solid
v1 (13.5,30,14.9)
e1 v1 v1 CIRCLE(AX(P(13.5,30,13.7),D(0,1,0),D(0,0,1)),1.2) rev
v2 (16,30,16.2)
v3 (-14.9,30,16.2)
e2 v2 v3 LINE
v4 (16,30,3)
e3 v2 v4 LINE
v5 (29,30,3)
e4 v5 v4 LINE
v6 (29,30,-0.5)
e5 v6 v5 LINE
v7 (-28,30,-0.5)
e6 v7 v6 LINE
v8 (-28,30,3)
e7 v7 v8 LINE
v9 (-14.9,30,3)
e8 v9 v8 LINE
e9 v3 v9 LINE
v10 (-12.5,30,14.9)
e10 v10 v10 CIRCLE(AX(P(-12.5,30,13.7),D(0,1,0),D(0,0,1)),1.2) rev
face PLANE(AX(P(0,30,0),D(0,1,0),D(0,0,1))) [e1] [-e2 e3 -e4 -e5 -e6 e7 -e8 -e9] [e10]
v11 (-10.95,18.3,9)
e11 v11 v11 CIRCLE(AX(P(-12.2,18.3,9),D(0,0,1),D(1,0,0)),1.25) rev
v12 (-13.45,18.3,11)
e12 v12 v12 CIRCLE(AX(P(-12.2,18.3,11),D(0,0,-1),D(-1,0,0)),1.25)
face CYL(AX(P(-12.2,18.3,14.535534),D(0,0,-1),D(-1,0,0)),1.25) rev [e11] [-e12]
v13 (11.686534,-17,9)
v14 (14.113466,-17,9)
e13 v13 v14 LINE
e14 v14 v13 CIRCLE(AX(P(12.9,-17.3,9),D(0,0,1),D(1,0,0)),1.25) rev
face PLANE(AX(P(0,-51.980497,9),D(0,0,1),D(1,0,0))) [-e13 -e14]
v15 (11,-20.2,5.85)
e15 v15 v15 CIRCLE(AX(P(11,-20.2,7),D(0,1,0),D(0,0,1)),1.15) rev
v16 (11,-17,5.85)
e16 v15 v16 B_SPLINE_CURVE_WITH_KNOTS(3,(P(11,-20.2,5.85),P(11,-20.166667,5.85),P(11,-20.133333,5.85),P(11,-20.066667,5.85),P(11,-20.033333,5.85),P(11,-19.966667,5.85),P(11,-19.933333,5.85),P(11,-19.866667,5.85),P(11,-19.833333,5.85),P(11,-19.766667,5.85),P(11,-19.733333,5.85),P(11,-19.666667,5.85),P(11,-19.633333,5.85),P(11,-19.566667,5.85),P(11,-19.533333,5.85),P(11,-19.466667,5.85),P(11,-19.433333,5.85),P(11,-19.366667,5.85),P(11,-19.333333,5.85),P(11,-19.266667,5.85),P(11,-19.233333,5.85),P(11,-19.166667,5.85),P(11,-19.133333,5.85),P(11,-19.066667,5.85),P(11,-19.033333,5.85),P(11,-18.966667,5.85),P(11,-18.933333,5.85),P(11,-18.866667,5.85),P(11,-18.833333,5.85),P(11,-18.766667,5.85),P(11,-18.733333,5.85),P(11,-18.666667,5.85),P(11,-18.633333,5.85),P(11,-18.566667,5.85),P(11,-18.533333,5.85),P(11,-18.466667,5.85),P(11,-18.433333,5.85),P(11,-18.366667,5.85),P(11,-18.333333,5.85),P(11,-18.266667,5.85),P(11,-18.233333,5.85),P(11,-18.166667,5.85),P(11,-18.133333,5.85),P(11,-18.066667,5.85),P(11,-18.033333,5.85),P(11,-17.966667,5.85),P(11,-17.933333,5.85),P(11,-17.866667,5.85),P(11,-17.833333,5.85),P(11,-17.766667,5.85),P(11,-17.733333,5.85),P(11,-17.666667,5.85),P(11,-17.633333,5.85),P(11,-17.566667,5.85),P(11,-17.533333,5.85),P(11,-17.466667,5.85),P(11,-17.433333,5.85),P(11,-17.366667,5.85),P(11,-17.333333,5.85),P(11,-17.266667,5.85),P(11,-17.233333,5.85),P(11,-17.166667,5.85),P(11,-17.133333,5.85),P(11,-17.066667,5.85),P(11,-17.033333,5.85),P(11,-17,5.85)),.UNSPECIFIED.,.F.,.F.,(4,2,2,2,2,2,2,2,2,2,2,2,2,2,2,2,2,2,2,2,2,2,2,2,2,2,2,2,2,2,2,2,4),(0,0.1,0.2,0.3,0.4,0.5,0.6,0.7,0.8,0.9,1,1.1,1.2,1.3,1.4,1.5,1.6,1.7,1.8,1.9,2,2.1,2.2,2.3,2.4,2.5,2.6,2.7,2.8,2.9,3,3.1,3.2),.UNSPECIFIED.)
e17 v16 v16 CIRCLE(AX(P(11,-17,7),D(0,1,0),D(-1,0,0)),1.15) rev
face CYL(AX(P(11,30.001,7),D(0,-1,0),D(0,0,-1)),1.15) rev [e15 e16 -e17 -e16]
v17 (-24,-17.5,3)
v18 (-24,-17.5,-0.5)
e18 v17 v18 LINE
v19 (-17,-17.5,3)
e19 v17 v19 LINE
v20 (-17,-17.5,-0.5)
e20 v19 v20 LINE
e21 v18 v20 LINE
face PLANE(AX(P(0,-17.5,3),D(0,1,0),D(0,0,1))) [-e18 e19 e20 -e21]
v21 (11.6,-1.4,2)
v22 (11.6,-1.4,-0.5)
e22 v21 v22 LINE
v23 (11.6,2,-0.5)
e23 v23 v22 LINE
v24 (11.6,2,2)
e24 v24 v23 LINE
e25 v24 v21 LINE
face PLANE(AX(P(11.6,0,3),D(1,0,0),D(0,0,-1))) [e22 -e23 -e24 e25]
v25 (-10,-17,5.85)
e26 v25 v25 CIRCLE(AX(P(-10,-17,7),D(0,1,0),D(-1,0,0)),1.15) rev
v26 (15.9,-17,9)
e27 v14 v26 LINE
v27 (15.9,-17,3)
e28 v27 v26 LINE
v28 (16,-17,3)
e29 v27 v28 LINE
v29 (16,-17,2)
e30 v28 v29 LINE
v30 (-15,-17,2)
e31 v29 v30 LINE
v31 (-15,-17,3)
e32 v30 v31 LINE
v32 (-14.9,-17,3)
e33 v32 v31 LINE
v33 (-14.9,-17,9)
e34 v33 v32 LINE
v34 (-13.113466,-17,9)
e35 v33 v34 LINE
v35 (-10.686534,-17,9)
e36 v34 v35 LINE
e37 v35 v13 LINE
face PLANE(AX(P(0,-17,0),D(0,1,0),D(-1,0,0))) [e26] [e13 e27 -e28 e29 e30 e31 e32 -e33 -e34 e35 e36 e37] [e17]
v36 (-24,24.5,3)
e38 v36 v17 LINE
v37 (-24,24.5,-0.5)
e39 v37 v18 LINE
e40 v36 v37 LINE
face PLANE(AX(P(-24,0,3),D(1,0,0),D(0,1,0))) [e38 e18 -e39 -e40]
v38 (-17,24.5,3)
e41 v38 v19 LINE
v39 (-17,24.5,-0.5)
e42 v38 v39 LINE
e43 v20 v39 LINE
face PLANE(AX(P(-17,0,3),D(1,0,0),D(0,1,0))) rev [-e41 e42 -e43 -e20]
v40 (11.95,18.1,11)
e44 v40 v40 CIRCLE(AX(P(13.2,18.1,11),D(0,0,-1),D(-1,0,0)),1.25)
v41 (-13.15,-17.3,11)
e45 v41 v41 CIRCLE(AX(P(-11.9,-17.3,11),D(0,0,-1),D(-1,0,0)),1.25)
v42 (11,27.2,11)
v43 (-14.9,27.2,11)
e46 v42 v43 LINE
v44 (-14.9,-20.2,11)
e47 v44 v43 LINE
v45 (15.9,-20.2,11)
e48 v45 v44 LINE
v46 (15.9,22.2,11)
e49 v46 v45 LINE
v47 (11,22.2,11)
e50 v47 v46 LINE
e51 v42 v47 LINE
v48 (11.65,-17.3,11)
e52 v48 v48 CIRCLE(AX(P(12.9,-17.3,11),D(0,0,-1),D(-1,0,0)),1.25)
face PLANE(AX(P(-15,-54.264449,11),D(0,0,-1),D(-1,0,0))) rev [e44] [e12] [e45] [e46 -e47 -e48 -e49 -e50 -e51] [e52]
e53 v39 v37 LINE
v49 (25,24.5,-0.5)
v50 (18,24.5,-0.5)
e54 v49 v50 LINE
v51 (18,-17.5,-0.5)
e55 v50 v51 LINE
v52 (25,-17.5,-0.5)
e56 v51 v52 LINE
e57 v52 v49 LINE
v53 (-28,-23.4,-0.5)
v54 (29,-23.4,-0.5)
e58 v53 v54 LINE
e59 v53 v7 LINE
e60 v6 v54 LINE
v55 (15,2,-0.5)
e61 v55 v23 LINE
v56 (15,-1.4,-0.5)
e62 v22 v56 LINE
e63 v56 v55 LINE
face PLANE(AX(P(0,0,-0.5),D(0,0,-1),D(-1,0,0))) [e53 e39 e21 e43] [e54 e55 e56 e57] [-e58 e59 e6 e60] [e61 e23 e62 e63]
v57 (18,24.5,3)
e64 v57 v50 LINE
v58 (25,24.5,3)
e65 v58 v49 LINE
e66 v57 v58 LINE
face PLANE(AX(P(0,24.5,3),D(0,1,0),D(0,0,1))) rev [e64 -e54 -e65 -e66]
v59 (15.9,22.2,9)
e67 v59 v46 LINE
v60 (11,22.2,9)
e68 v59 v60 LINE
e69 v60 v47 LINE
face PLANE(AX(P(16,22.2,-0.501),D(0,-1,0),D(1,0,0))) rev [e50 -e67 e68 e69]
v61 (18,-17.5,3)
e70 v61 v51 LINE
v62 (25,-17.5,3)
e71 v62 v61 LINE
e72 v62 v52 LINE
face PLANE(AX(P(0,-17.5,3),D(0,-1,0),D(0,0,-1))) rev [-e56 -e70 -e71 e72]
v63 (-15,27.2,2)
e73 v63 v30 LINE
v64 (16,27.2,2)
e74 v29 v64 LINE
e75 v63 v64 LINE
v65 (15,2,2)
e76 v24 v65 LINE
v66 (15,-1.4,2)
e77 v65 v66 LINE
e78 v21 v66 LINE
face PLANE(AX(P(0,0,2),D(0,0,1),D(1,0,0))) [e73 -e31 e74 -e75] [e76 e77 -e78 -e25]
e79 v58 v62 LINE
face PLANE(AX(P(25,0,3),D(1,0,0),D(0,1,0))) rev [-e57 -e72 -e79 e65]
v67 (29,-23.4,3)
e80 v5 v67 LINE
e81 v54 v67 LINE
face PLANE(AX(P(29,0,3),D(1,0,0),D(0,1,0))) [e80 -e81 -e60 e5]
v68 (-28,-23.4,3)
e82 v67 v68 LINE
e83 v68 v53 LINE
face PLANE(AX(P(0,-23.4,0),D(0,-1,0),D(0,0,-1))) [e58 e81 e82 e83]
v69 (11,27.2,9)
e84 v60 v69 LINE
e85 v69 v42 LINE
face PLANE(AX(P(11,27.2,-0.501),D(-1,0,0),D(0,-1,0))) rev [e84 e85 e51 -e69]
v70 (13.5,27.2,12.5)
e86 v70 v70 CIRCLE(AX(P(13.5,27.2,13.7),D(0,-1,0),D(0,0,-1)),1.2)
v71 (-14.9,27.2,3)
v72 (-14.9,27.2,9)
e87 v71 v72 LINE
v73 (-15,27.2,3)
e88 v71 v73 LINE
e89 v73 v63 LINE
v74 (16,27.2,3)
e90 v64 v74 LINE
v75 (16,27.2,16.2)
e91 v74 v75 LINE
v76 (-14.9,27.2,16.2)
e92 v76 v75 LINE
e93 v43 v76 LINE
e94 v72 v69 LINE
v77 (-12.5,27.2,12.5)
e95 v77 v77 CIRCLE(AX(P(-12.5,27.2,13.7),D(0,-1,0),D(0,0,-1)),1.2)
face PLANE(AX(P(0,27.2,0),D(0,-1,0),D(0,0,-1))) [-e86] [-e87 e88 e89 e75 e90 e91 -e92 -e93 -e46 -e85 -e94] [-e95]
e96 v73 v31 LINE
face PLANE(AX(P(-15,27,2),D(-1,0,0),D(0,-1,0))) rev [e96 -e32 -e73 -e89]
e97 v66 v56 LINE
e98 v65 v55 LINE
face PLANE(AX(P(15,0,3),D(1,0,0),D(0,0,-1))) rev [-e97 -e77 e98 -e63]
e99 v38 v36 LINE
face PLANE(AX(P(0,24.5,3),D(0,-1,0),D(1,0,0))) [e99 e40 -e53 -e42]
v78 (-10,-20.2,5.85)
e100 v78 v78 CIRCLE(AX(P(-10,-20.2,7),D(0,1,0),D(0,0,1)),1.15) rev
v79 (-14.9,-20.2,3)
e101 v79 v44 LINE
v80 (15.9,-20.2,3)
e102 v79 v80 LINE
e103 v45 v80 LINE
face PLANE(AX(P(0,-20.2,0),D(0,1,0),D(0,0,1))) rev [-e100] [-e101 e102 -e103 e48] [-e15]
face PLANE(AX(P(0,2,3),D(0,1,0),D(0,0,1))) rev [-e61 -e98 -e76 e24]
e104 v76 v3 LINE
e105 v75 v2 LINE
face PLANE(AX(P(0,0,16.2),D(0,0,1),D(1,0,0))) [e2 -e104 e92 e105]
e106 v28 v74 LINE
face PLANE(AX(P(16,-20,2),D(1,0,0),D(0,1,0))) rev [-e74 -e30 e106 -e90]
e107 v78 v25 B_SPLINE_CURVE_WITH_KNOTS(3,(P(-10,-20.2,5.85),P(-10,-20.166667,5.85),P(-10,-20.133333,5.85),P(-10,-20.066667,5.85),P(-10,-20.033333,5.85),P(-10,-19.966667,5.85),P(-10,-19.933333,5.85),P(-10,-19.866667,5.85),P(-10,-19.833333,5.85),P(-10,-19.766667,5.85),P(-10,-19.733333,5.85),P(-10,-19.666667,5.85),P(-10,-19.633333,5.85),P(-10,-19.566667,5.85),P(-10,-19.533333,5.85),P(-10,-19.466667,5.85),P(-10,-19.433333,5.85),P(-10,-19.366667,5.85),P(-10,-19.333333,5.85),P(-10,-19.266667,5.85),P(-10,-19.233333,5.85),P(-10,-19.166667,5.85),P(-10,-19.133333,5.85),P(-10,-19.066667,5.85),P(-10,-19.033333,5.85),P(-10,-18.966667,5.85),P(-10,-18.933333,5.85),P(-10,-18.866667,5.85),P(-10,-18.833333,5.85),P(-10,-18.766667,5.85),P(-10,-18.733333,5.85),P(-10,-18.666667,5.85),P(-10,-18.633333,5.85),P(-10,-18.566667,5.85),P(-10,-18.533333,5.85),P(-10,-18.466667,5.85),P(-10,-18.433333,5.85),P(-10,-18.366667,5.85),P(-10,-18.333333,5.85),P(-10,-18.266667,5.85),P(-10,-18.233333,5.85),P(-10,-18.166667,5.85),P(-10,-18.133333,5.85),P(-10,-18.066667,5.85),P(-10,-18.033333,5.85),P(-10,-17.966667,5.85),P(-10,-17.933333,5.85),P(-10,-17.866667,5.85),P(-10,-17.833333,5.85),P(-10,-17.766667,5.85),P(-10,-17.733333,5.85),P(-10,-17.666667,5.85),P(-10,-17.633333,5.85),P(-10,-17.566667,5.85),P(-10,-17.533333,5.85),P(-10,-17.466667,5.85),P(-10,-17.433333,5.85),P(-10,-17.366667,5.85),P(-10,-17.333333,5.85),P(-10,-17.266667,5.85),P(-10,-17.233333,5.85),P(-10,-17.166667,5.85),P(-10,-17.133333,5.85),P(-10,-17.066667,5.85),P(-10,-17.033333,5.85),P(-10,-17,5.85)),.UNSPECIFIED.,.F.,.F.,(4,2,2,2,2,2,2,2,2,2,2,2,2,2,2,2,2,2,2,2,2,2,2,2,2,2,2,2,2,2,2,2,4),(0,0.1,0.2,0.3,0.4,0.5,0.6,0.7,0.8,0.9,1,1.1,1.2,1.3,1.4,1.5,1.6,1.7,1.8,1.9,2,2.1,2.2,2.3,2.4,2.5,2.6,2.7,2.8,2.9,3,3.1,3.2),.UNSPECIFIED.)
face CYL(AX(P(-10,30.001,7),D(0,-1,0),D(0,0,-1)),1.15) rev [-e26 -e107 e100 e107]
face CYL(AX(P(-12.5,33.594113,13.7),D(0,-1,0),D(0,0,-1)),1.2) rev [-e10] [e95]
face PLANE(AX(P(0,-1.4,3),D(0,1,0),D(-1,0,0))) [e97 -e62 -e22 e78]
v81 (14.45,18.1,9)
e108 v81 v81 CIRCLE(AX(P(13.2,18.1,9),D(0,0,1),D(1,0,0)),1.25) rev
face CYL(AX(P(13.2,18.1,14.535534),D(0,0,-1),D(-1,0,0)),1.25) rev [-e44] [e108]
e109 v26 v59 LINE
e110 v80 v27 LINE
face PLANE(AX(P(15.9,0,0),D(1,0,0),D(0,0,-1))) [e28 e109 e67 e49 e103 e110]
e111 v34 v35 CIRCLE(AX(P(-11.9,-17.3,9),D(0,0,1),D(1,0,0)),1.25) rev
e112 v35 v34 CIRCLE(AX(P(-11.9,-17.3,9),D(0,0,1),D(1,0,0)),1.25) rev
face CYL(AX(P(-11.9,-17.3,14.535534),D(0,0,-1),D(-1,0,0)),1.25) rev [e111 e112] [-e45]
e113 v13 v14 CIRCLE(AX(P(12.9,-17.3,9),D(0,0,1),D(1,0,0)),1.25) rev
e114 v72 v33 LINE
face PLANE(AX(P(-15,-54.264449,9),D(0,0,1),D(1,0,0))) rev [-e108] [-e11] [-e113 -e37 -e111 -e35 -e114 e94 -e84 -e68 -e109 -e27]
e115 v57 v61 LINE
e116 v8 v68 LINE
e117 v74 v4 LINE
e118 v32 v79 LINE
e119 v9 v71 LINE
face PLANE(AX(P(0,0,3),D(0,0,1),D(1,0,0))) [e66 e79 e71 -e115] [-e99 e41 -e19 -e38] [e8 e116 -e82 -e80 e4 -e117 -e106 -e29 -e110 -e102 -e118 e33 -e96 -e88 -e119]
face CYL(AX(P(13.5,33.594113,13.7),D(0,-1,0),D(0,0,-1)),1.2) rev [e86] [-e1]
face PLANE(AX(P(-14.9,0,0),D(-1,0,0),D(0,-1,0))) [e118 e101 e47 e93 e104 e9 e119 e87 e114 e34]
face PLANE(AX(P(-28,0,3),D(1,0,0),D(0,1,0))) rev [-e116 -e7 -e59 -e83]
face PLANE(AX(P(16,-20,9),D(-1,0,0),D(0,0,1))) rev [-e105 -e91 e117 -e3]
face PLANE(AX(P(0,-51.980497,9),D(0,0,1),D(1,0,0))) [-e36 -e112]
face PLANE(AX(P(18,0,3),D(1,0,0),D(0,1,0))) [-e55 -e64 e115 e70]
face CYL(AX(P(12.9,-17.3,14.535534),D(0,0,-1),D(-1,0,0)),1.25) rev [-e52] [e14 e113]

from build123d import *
from build123d.topology import SkipClean

# Parameters (mm, degrees)
SKETCH_1_W            = 57
SKETCH_1_H            = 51
SKETCH_1_W_2          = 3.4
SKETCH_1_H_2          = 3.4
SKETCH_1_W_3          = 7
SKETCH_1_H_3          = 42
EXTRUDE_1_DEPTH       = 3
SKETCH_2_W            = 31
SKETCH_2_H            = 47
CUT_EXTRUDE_1_DEPTH   = 1
SKETCH_5_W            = 57
SKETCH_5_H            = 3
EXTRUDE_2_DEPTH       = 1
SKETCH_6_W            = 57
SKETCH_6_H            = 3
EXTRUDE_3_DEPTH       = 1
SKETCH_7_W            = 10
SKETCH_7_H            = 3
EXTRUDE_4_DEPTH       = 6
SKETCH_8_W            = 31
SKETCH_8_H            = 3
EXTRUDE_5_DEPTH       = 6
CUT_EXTRUDE_3_REACH   = 63.082
SKETCH_9_R            = 1.15
EXTRUDE_6_OUTLINE_W   = 57
EXTRUDE_6_OUTLINE_H   = 53
EXTRUDE_6_OUTLINE_W_2 = 3.4
EXTRUDE_6_OUTLINE_H_2 = 3.4
EXTRUDE_6_OUTLINE_W_3 = 7
EXTRUDE_6_OUTLINE_H_3 = 42
EXTRUDE_6_DEPTH       = 0.5
EXTRUDE_7_DEPTH       = 0.2
EXTRUDE_START         = 0.2
SKETCH_14_R           = 1.15
EXTRUDE_8_DEPTH       = 0.2
CUT_EXTRUDE_START     = -0.2
SKETCH_15_R           = 1.15
CUT_EXTRUDE_5_DEPTH   = 0.2
CUT_EXTRUDE_6_DEPTH   = 0.2
SKETCH_17_W           = 31
SKETCH_17_H           = 3
EXTRUDE_9_DEPTH       = 5
SKETCH_18_W           = 31
SKETCH_18_H           = 2
EXTRUDE_10_DEPTH      = 50.4
SKETCH_3_R            = 1.25
CUT_EXTRUDE_7_DEPTH   = 9
EXTRUDE_START_2       = -0.2
EXTRUDE_11_OUTLINE_R  = 1.15
EXTRUDE_11_DEPTH      = 3.2
SKETCH_22_W           = 31
SKETCH_22_H           = 6
CUT_EXTRUDE_10_DEPTH  = 3
SKETCH_17_2_W         = 31
SKETCH_17_2_H         = 3
EXTRUDE_12_DEPTH      = 7.2
SKETCH_24_W           = 31
SKETCH_24_H           = 2
CUT_EXTRUDE_11_DEPTH  = 3
SKETCH_25_R           = 1.2
CUT_EXTRUDE_12_DEPTH  = 3
SKETCH_27_W           = 11
SKETCH_27_H           = 3.2
EXTRUDE_13_DEPTH      = 6
CUT_EXTRUDE_13_REACH  = 45.42
SKETCH_28_W           = 5
SKETCH_28_H           = 5
SKETCH_31_W           = 64.96263637
SKETCH_31_H           = 23.079945777
CUT_EXTRUDE_14_DEPTH  = 0.2
SKETCH_32_W           = 57
SKETCH_32_H           = 3.5
EXTRUDE_14_DEPTH      = 0.2
CUT_EXTRUDE_15_DEPTH  = 0.1
CUT_EXTRUDE_16_DEPTH  = 0.1


# Read off the part's stored shape, not the designer's step: 凸台-拉伸6, 凸台-拉伸11
with BuildPart() as part:
    # 草图1 → 凸台-拉伸1 (new body)
    with BuildSketch(Plane.XY):
        with Locations((0.5, 3.5)):
            Rectangle(SKETCH_1_W, SKETCH_1_H)
        with Locations((13.3, 0.3)):
            Rectangle(SKETCH_1_W_2, SKETCH_1_H_2, mode=Mode.SUBTRACT)
        with Locations((21.5, 3.5)):
            Rectangle(SKETCH_1_W_3, SKETCH_1_H_3, mode=Mode.SUBTRACT)
        with Locations((-20.5, 3.5)):
            Rectangle(SKETCH_1_W_3, SKETCH_1_H_3, mode=Mode.SUBTRACT)
    extrude(amount=EXTRUDE_1_DEPTH)

    # 草图2 → 切除-拉伸1 (cut)
    with BuildSketch(Plane.XY.offset(3)):
        with Locations((0.5, 3.5)):
            Rectangle(SKETCH_2_W, SKETCH_2_H)
    extrude(amount=-CUT_EXTRUDE_1_DEPTH, mode=Mode.SUBTRACT)

    # 草图5 → 凸台-拉伸2 (add)
    with BuildSketch(Plane(origin=(0, 29, 0), x_dir=(1, 0, 0), z_dir=(0, 1, 0))):
        with Locations((0.5, -1.5)):
            Rectangle(SKETCH_5_W, SKETCH_5_H)
    extrude(amount=EXTRUDE_2_DEPTH)

    # 草图6 → 凸台-拉伸3 (add)
    with BuildSketch(Plane(origin=(0, -22, 0), x_dir=(-1, 0, 0), z_dir=(0, -1, 0))):
        with Locations((-0.5, -1.5)):
            Rectangle(SKETCH_6_W, SKETCH_6_H)
    extrude(amount=EXTRUDE_3_DEPTH)

    # 草图7 → 凸台-拉伸4 (add)
    with BuildSketch(Plane.XY.offset(3)):
        with Locations((-10, -21.5)):
            Rectangle(SKETCH_7_W, SKETCH_7_H)
        with Locations((11, -21.5)):
            Rectangle(SKETCH_7_W, SKETCH_7_H)
    extrude(amount=EXTRUDE_4_DEPTH)

    # 草图8 → 凸台-拉伸5 (add)
    with BuildSketch(Plane.XY.offset(3)):
        with Locations((0.5, 28.5)):
            Rectangle(SKETCH_8_W, SKETCH_8_H)
    extrude(amount=EXTRUDE_5_DEPTH)

    # 草图9 → 切除-拉伸3 (cut, up to next)
    with BuildSketch(Plane.XZ.offset(23), mode=Mode.PRIVATE) as cut_extrude_3_sk1:
        with Locations(Location((-10, 7, 0), (0, 0, 270))):
            Circle(SKETCH_9_R)
    cut_extrude_3_tool1 = extrude(cut_extrude_3_sk1.sketch, amount=-CUT_EXTRUDE_3_REACH, mode=Mode.PRIVATE) & part.part
    # 草图9 → 切除-拉伸3 (cut, up to next)
    with BuildSketch(Plane.XZ.offset(23), mode=Mode.PRIVATE) as cut_extrude_3_sk2:
        with Locations(Location((11, 7, 0), (0, 0, 270))):
            Circle(SKETCH_9_R)
    cut_extrude_3_tool2 = extrude(cut_extrude_3_sk2.sketch, amount=-CUT_EXTRUDE_3_REACH, mode=Mode.PRIVATE) & part.part
    add(cut_extrude_3_tool1.solids().sort_by_distance((-10, -23, 7))[0], mode=Mode.SUBTRACT)
    add(cut_extrude_3_tool2.solids().sort_by_distance((11, -23, 7))[0], mode=Mode.SUBTRACT)

    # 凸台-拉伸6 outline → 凸台-拉伸6 (add)
    with BuildSketch(Plane(origin=(0, 0, 0), x_dir=(-1, 0, 0), z_dir=(0, 0, -1))):
        with Locations((-0.5, 3.5)):
            Rectangle(EXTRUDE_6_OUTLINE_W, EXTRUDE_6_OUTLINE_H)
        with Locations((-13.3, 0.3)):
            Rectangle(EXTRUDE_6_OUTLINE_W_2, EXTRUDE_6_OUTLINE_H_2, mode=Mode.SUBTRACT)
        with Locations((-21.5, 3.5)):
            Rectangle(EXTRUDE_6_OUTLINE_W_3, EXTRUDE_6_OUTLINE_H_3, mode=Mode.SUBTRACT)
        with Locations((20.5, 3.5)):
            Rectangle(EXTRUDE_6_OUTLINE_W_3, EXTRUDE_6_OUTLINE_H_3, mode=Mode.SUBTRACT)
    extrude(amount=EXTRUDE_6_DEPTH)

    # 草图13 → 凸台-拉伸7 (add)
    with BuildSketch(Plane(origin=(0, 30, 0), x_dir=(1, 0, 0), z_dir=(0, 1, 0))):
        Polygon((16, -3), (29, -3), (29, 0.5), (-28, 0.5), (-28, -3), (-15, -3), (-15, -9), (16, -9), align=None)
    extrude(amount=EXTRUDE_7_DEPTH)

    # 草图14 → 凸台-拉伸8 (add)
    with BuildSketch(Plane(origin=(0, -23, 0), x_dir=(-1, 0, 0), z_dir=(0, -1, 0)).offset(EXTRUDE_START)):
        Polygon((-29, 0.5), (-29, -3), (-16, -3), (-16, -9), (-6, -9), (-6, -3), (5, -3), (5, -9), (15, -9), (15, -3), (28, -3), (28, 0.5), align=None)
        with Locations(Location((-11, -7, 0), (0, 0, 90))):
            Circle(SKETCH_14_R, mode=Mode.SUBTRACT)
        with Locations(Location((10, -7, 0), (0, 0, 90))):
            Circle(SKETCH_14_R, mode=Mode.SUBTRACT)
    extrude(amount=-EXTRUDE_8_DEPTH)

    # 草图15 → 切除-拉伸5 (cut)
    with BuildSketch(Plane(origin=(0, -20, 0), x_dir=(1, 0, 0), z_dir=(0, 1, 0)).offset(CUT_EXTRUDE_START)):
        Polygon((16, -2), (-15, -2), (-15, -3), (-15, -9), (-5, -9), (-5, -3), (6, -3), (6, -9), (16, -9), (16, -3), align=None)
        with Locations(Location((11, -7, 0), (0, 0, 90))):
            Circle(SKETCH_15_R, mode=Mode.SUBTRACT)
        with Locations(Location((-10, -7, 0), (0, 0, 90))):
            Circle(SKETCH_15_R, mode=Mode.SUBTRACT)
    extrude(amount=CUT_EXTRUDE_5_DEPTH, mode=Mode.SUBTRACT)

    # 草图16 → 切除-拉伸6 (cut)
    with BuildSketch(Plane.XZ.offset(-27)):
        Polygon((-15, 2), (16, 2), (16, 3), (16, 9), (-15, 9), (-15, 3), align=None)
    extrude(amount=-CUT_EXTRUDE_6_DEPTH, mode=Mode.SUBTRACT)

    # 草图17 → 凸台-拉伸9 (add)
    with BuildSketch(Plane.XY.offset(9)):
        with Locations((0.5, 28.7)):
            Rectangle(SKETCH_17_W, SKETCH_17_H)
    extrude(amount=EXTRUDE_9_DEPTH)

    # 草图18 → 凸台-拉伸10 (add)
    with BuildSketch(Plane.XZ.offset(-27.2)):
        with Locations((0.5, 10)):
            Rectangle(SKETCH_18_W, SKETCH_18_H)
    extrude(amount=EXTRUDE_10_DEPTH)

    # 草图3 → 切除-拉伸7 (cut)
    with BuildSketch(Plane.XY.offset(2)):
        with Locations(Location((-12.2, 18.3, 0), (0, 0, 180))):
            Circle(SKETCH_3_R)
        with Locations(Location((13.2, 18.1, 0), (0, 0, 180))):
            Circle(SKETCH_3_R)
        with Locations(Location((12.9, -17.3, 0), (0, 0, 180))):
            Circle(SKETCH_3_R)
        with Locations(Location((-11.9, -17.3, 0), (0, 0, 180))):
            Circle(SKETCH_3_R)
    extrude(amount=CUT_EXTRUDE_7_DEPTH, mode=Mode.SUBTRACT)

    # 凸台-拉伸11 outline → 凸台-拉伸11 (add)
    with SkipClean():  # the faces are left unmerged after this step: merging them gives an invalid solid
        with BuildSketch(Plane(origin=(0, -20, 0), x_dir=(1, 0, 0), z_dir=(0, 1, 0)).offset(EXTRUDE_START_2)):
            Polygon((-5, -9), (-5, -3), (6, -3), (6, -9), (16, -9), (16, -2), (-15, -2), (-15, -9), align=None)
            with Locations((-10, -7)):
                Circle(EXTRUDE_11_OUTLINE_R, mode=Mode.SUBTRACT)
            with Locations((11, -7)):
                Circle(EXTRUDE_11_OUTLINE_R, mode=Mode.SUBTRACT)
        extrude(amount=EXTRUDE_11_DEPTH)

    # 草图22 → 切除-拉伸10 (cut)
    with BuildSketch(Plane(origin=(0, -23.2, 0), x_dir=(-1, 0, 0), z_dir=(0, -1, 0))):
        with Locations((-0.5, -6)):
            Rectangle(SKETCH_22_W, SKETCH_22_H)
    extrude(amount=-CUT_EXTRUDE_10_DEPTH, mode=Mode.SUBTRACT)

    # 草图17<2> → 凸台-拉伸12 (add)
    with BuildSketch(Plane.XY.offset(9)):
        with Locations((0.5, 28.7)):
            Rectangle(SKETCH_17_2_W, SKETCH_17_2_H)
    extrude(amount=EXTRUDE_12_DEPTH)

    # 草图24 → 切除-拉伸11 (cut)
    with BuildSketch(Plane.XZ.offset(23.2)):
        with Locations((0.5, 10)):
            Rectangle(SKETCH_24_W, SKETCH_24_H)
    extrude(amount=-CUT_EXTRUDE_11_DEPTH, mode=Mode.SUBTRACT)

    # 草图25 → 切除-拉伸12 (cut)
    with BuildSketch(Plane.XZ.offset(-27.2)):
        with Locations(Location((-12.5, 13.7, 0), (0, 0, 270))):
            Circle(SKETCH_25_R)
        with Locations(Location((13.5, 13.7, 0), (0, 0, 270))):
            Circle(SKETCH_25_R)
    extrude(amount=-CUT_EXTRUDE_12_DEPTH, mode=Mode.SUBTRACT)

    # 草图27 → 凸台-拉伸13 (add)
    with BuildSketch(Plane.XY.offset(3)):
        with Locations((0.5, -18.6)):
            Rectangle(SKETCH_27_W, SKETCH_27_H)
    extrude(amount=EXTRUDE_13_DEPTH)

    # 草图28 → 切除-拉伸13 (cut, up to next)
    with BuildSketch(Plane.XY.offset(11), mode=Mode.PRIVATE) as cut_extrude_13_sk1:
        with Locations((13.5, 24.7)):
            Rectangle(SKETCH_28_W, SKETCH_28_H)
    cut_extrude_13_tool1 = extrude(cut_extrude_13_sk1.sketch, amount=-CUT_EXTRUDE_13_REACH, mode=Mode.PRIVATE) & part.part
    add(cut_extrude_13_tool1.solids().sort_by_distance((13.5, 24.7, 11))[0], mode=Mode.SUBTRACT)

    # 草图31 → 切除-拉伸14 (cut)
    with BuildSketch(Plane(origin=(0, 30.2, 0), x_dir=(1, 0, 0), z_dir=(0, 1, 0))):
        with Locations((-0.558713109, -6.113710501)):
            Rectangle(SKETCH_31_W, SKETCH_31_H)
    extrude(amount=-CUT_EXTRUDE_14_DEPTH, mode=Mode.SUBTRACT)

    # 草图32 → 凸台-拉伸14 (add)
    with BuildSketch(Plane.XZ.offset(23.2)):
        with Locations((0.5, 1.25)):
            Rectangle(SKETCH_32_W, SKETCH_32_H)
    extrude(amount=EXTRUDE_14_DEPTH)

    # 草图33 → 切除-拉伸15 (cut)
    with BuildSketch(Plane.ZY.offset(15)):
        Polygon((16.2, 27.2), (16.2, 30), (3, 30), (3, 27.2), (9, 27.2), (9, -17), (3, -17), (3, -20.2), (11, -20.2), (11, 27.2), align=None)
    extrude(amount=-CUT_EXTRUDE_15_DEPTH, mode=Mode.SUBTRACT)

    # 草图34 → 切除-拉伸16 (cut)
    with BuildSketch(Plane(origin=(16, 0, 0), x_dir=(0, 0, -1), z_dir=(1, 0, 0))):
        Polygon((-3, -17), (-9, -17), (-9, 22.2), (-11, 22.2), (-11, -20.2), (-3, -20.2), align=None)
    extrude(amount=-CUT_EXTRUDE_16_DEPTH, mode=Mode.SUBTRACT)


solid = part.part
